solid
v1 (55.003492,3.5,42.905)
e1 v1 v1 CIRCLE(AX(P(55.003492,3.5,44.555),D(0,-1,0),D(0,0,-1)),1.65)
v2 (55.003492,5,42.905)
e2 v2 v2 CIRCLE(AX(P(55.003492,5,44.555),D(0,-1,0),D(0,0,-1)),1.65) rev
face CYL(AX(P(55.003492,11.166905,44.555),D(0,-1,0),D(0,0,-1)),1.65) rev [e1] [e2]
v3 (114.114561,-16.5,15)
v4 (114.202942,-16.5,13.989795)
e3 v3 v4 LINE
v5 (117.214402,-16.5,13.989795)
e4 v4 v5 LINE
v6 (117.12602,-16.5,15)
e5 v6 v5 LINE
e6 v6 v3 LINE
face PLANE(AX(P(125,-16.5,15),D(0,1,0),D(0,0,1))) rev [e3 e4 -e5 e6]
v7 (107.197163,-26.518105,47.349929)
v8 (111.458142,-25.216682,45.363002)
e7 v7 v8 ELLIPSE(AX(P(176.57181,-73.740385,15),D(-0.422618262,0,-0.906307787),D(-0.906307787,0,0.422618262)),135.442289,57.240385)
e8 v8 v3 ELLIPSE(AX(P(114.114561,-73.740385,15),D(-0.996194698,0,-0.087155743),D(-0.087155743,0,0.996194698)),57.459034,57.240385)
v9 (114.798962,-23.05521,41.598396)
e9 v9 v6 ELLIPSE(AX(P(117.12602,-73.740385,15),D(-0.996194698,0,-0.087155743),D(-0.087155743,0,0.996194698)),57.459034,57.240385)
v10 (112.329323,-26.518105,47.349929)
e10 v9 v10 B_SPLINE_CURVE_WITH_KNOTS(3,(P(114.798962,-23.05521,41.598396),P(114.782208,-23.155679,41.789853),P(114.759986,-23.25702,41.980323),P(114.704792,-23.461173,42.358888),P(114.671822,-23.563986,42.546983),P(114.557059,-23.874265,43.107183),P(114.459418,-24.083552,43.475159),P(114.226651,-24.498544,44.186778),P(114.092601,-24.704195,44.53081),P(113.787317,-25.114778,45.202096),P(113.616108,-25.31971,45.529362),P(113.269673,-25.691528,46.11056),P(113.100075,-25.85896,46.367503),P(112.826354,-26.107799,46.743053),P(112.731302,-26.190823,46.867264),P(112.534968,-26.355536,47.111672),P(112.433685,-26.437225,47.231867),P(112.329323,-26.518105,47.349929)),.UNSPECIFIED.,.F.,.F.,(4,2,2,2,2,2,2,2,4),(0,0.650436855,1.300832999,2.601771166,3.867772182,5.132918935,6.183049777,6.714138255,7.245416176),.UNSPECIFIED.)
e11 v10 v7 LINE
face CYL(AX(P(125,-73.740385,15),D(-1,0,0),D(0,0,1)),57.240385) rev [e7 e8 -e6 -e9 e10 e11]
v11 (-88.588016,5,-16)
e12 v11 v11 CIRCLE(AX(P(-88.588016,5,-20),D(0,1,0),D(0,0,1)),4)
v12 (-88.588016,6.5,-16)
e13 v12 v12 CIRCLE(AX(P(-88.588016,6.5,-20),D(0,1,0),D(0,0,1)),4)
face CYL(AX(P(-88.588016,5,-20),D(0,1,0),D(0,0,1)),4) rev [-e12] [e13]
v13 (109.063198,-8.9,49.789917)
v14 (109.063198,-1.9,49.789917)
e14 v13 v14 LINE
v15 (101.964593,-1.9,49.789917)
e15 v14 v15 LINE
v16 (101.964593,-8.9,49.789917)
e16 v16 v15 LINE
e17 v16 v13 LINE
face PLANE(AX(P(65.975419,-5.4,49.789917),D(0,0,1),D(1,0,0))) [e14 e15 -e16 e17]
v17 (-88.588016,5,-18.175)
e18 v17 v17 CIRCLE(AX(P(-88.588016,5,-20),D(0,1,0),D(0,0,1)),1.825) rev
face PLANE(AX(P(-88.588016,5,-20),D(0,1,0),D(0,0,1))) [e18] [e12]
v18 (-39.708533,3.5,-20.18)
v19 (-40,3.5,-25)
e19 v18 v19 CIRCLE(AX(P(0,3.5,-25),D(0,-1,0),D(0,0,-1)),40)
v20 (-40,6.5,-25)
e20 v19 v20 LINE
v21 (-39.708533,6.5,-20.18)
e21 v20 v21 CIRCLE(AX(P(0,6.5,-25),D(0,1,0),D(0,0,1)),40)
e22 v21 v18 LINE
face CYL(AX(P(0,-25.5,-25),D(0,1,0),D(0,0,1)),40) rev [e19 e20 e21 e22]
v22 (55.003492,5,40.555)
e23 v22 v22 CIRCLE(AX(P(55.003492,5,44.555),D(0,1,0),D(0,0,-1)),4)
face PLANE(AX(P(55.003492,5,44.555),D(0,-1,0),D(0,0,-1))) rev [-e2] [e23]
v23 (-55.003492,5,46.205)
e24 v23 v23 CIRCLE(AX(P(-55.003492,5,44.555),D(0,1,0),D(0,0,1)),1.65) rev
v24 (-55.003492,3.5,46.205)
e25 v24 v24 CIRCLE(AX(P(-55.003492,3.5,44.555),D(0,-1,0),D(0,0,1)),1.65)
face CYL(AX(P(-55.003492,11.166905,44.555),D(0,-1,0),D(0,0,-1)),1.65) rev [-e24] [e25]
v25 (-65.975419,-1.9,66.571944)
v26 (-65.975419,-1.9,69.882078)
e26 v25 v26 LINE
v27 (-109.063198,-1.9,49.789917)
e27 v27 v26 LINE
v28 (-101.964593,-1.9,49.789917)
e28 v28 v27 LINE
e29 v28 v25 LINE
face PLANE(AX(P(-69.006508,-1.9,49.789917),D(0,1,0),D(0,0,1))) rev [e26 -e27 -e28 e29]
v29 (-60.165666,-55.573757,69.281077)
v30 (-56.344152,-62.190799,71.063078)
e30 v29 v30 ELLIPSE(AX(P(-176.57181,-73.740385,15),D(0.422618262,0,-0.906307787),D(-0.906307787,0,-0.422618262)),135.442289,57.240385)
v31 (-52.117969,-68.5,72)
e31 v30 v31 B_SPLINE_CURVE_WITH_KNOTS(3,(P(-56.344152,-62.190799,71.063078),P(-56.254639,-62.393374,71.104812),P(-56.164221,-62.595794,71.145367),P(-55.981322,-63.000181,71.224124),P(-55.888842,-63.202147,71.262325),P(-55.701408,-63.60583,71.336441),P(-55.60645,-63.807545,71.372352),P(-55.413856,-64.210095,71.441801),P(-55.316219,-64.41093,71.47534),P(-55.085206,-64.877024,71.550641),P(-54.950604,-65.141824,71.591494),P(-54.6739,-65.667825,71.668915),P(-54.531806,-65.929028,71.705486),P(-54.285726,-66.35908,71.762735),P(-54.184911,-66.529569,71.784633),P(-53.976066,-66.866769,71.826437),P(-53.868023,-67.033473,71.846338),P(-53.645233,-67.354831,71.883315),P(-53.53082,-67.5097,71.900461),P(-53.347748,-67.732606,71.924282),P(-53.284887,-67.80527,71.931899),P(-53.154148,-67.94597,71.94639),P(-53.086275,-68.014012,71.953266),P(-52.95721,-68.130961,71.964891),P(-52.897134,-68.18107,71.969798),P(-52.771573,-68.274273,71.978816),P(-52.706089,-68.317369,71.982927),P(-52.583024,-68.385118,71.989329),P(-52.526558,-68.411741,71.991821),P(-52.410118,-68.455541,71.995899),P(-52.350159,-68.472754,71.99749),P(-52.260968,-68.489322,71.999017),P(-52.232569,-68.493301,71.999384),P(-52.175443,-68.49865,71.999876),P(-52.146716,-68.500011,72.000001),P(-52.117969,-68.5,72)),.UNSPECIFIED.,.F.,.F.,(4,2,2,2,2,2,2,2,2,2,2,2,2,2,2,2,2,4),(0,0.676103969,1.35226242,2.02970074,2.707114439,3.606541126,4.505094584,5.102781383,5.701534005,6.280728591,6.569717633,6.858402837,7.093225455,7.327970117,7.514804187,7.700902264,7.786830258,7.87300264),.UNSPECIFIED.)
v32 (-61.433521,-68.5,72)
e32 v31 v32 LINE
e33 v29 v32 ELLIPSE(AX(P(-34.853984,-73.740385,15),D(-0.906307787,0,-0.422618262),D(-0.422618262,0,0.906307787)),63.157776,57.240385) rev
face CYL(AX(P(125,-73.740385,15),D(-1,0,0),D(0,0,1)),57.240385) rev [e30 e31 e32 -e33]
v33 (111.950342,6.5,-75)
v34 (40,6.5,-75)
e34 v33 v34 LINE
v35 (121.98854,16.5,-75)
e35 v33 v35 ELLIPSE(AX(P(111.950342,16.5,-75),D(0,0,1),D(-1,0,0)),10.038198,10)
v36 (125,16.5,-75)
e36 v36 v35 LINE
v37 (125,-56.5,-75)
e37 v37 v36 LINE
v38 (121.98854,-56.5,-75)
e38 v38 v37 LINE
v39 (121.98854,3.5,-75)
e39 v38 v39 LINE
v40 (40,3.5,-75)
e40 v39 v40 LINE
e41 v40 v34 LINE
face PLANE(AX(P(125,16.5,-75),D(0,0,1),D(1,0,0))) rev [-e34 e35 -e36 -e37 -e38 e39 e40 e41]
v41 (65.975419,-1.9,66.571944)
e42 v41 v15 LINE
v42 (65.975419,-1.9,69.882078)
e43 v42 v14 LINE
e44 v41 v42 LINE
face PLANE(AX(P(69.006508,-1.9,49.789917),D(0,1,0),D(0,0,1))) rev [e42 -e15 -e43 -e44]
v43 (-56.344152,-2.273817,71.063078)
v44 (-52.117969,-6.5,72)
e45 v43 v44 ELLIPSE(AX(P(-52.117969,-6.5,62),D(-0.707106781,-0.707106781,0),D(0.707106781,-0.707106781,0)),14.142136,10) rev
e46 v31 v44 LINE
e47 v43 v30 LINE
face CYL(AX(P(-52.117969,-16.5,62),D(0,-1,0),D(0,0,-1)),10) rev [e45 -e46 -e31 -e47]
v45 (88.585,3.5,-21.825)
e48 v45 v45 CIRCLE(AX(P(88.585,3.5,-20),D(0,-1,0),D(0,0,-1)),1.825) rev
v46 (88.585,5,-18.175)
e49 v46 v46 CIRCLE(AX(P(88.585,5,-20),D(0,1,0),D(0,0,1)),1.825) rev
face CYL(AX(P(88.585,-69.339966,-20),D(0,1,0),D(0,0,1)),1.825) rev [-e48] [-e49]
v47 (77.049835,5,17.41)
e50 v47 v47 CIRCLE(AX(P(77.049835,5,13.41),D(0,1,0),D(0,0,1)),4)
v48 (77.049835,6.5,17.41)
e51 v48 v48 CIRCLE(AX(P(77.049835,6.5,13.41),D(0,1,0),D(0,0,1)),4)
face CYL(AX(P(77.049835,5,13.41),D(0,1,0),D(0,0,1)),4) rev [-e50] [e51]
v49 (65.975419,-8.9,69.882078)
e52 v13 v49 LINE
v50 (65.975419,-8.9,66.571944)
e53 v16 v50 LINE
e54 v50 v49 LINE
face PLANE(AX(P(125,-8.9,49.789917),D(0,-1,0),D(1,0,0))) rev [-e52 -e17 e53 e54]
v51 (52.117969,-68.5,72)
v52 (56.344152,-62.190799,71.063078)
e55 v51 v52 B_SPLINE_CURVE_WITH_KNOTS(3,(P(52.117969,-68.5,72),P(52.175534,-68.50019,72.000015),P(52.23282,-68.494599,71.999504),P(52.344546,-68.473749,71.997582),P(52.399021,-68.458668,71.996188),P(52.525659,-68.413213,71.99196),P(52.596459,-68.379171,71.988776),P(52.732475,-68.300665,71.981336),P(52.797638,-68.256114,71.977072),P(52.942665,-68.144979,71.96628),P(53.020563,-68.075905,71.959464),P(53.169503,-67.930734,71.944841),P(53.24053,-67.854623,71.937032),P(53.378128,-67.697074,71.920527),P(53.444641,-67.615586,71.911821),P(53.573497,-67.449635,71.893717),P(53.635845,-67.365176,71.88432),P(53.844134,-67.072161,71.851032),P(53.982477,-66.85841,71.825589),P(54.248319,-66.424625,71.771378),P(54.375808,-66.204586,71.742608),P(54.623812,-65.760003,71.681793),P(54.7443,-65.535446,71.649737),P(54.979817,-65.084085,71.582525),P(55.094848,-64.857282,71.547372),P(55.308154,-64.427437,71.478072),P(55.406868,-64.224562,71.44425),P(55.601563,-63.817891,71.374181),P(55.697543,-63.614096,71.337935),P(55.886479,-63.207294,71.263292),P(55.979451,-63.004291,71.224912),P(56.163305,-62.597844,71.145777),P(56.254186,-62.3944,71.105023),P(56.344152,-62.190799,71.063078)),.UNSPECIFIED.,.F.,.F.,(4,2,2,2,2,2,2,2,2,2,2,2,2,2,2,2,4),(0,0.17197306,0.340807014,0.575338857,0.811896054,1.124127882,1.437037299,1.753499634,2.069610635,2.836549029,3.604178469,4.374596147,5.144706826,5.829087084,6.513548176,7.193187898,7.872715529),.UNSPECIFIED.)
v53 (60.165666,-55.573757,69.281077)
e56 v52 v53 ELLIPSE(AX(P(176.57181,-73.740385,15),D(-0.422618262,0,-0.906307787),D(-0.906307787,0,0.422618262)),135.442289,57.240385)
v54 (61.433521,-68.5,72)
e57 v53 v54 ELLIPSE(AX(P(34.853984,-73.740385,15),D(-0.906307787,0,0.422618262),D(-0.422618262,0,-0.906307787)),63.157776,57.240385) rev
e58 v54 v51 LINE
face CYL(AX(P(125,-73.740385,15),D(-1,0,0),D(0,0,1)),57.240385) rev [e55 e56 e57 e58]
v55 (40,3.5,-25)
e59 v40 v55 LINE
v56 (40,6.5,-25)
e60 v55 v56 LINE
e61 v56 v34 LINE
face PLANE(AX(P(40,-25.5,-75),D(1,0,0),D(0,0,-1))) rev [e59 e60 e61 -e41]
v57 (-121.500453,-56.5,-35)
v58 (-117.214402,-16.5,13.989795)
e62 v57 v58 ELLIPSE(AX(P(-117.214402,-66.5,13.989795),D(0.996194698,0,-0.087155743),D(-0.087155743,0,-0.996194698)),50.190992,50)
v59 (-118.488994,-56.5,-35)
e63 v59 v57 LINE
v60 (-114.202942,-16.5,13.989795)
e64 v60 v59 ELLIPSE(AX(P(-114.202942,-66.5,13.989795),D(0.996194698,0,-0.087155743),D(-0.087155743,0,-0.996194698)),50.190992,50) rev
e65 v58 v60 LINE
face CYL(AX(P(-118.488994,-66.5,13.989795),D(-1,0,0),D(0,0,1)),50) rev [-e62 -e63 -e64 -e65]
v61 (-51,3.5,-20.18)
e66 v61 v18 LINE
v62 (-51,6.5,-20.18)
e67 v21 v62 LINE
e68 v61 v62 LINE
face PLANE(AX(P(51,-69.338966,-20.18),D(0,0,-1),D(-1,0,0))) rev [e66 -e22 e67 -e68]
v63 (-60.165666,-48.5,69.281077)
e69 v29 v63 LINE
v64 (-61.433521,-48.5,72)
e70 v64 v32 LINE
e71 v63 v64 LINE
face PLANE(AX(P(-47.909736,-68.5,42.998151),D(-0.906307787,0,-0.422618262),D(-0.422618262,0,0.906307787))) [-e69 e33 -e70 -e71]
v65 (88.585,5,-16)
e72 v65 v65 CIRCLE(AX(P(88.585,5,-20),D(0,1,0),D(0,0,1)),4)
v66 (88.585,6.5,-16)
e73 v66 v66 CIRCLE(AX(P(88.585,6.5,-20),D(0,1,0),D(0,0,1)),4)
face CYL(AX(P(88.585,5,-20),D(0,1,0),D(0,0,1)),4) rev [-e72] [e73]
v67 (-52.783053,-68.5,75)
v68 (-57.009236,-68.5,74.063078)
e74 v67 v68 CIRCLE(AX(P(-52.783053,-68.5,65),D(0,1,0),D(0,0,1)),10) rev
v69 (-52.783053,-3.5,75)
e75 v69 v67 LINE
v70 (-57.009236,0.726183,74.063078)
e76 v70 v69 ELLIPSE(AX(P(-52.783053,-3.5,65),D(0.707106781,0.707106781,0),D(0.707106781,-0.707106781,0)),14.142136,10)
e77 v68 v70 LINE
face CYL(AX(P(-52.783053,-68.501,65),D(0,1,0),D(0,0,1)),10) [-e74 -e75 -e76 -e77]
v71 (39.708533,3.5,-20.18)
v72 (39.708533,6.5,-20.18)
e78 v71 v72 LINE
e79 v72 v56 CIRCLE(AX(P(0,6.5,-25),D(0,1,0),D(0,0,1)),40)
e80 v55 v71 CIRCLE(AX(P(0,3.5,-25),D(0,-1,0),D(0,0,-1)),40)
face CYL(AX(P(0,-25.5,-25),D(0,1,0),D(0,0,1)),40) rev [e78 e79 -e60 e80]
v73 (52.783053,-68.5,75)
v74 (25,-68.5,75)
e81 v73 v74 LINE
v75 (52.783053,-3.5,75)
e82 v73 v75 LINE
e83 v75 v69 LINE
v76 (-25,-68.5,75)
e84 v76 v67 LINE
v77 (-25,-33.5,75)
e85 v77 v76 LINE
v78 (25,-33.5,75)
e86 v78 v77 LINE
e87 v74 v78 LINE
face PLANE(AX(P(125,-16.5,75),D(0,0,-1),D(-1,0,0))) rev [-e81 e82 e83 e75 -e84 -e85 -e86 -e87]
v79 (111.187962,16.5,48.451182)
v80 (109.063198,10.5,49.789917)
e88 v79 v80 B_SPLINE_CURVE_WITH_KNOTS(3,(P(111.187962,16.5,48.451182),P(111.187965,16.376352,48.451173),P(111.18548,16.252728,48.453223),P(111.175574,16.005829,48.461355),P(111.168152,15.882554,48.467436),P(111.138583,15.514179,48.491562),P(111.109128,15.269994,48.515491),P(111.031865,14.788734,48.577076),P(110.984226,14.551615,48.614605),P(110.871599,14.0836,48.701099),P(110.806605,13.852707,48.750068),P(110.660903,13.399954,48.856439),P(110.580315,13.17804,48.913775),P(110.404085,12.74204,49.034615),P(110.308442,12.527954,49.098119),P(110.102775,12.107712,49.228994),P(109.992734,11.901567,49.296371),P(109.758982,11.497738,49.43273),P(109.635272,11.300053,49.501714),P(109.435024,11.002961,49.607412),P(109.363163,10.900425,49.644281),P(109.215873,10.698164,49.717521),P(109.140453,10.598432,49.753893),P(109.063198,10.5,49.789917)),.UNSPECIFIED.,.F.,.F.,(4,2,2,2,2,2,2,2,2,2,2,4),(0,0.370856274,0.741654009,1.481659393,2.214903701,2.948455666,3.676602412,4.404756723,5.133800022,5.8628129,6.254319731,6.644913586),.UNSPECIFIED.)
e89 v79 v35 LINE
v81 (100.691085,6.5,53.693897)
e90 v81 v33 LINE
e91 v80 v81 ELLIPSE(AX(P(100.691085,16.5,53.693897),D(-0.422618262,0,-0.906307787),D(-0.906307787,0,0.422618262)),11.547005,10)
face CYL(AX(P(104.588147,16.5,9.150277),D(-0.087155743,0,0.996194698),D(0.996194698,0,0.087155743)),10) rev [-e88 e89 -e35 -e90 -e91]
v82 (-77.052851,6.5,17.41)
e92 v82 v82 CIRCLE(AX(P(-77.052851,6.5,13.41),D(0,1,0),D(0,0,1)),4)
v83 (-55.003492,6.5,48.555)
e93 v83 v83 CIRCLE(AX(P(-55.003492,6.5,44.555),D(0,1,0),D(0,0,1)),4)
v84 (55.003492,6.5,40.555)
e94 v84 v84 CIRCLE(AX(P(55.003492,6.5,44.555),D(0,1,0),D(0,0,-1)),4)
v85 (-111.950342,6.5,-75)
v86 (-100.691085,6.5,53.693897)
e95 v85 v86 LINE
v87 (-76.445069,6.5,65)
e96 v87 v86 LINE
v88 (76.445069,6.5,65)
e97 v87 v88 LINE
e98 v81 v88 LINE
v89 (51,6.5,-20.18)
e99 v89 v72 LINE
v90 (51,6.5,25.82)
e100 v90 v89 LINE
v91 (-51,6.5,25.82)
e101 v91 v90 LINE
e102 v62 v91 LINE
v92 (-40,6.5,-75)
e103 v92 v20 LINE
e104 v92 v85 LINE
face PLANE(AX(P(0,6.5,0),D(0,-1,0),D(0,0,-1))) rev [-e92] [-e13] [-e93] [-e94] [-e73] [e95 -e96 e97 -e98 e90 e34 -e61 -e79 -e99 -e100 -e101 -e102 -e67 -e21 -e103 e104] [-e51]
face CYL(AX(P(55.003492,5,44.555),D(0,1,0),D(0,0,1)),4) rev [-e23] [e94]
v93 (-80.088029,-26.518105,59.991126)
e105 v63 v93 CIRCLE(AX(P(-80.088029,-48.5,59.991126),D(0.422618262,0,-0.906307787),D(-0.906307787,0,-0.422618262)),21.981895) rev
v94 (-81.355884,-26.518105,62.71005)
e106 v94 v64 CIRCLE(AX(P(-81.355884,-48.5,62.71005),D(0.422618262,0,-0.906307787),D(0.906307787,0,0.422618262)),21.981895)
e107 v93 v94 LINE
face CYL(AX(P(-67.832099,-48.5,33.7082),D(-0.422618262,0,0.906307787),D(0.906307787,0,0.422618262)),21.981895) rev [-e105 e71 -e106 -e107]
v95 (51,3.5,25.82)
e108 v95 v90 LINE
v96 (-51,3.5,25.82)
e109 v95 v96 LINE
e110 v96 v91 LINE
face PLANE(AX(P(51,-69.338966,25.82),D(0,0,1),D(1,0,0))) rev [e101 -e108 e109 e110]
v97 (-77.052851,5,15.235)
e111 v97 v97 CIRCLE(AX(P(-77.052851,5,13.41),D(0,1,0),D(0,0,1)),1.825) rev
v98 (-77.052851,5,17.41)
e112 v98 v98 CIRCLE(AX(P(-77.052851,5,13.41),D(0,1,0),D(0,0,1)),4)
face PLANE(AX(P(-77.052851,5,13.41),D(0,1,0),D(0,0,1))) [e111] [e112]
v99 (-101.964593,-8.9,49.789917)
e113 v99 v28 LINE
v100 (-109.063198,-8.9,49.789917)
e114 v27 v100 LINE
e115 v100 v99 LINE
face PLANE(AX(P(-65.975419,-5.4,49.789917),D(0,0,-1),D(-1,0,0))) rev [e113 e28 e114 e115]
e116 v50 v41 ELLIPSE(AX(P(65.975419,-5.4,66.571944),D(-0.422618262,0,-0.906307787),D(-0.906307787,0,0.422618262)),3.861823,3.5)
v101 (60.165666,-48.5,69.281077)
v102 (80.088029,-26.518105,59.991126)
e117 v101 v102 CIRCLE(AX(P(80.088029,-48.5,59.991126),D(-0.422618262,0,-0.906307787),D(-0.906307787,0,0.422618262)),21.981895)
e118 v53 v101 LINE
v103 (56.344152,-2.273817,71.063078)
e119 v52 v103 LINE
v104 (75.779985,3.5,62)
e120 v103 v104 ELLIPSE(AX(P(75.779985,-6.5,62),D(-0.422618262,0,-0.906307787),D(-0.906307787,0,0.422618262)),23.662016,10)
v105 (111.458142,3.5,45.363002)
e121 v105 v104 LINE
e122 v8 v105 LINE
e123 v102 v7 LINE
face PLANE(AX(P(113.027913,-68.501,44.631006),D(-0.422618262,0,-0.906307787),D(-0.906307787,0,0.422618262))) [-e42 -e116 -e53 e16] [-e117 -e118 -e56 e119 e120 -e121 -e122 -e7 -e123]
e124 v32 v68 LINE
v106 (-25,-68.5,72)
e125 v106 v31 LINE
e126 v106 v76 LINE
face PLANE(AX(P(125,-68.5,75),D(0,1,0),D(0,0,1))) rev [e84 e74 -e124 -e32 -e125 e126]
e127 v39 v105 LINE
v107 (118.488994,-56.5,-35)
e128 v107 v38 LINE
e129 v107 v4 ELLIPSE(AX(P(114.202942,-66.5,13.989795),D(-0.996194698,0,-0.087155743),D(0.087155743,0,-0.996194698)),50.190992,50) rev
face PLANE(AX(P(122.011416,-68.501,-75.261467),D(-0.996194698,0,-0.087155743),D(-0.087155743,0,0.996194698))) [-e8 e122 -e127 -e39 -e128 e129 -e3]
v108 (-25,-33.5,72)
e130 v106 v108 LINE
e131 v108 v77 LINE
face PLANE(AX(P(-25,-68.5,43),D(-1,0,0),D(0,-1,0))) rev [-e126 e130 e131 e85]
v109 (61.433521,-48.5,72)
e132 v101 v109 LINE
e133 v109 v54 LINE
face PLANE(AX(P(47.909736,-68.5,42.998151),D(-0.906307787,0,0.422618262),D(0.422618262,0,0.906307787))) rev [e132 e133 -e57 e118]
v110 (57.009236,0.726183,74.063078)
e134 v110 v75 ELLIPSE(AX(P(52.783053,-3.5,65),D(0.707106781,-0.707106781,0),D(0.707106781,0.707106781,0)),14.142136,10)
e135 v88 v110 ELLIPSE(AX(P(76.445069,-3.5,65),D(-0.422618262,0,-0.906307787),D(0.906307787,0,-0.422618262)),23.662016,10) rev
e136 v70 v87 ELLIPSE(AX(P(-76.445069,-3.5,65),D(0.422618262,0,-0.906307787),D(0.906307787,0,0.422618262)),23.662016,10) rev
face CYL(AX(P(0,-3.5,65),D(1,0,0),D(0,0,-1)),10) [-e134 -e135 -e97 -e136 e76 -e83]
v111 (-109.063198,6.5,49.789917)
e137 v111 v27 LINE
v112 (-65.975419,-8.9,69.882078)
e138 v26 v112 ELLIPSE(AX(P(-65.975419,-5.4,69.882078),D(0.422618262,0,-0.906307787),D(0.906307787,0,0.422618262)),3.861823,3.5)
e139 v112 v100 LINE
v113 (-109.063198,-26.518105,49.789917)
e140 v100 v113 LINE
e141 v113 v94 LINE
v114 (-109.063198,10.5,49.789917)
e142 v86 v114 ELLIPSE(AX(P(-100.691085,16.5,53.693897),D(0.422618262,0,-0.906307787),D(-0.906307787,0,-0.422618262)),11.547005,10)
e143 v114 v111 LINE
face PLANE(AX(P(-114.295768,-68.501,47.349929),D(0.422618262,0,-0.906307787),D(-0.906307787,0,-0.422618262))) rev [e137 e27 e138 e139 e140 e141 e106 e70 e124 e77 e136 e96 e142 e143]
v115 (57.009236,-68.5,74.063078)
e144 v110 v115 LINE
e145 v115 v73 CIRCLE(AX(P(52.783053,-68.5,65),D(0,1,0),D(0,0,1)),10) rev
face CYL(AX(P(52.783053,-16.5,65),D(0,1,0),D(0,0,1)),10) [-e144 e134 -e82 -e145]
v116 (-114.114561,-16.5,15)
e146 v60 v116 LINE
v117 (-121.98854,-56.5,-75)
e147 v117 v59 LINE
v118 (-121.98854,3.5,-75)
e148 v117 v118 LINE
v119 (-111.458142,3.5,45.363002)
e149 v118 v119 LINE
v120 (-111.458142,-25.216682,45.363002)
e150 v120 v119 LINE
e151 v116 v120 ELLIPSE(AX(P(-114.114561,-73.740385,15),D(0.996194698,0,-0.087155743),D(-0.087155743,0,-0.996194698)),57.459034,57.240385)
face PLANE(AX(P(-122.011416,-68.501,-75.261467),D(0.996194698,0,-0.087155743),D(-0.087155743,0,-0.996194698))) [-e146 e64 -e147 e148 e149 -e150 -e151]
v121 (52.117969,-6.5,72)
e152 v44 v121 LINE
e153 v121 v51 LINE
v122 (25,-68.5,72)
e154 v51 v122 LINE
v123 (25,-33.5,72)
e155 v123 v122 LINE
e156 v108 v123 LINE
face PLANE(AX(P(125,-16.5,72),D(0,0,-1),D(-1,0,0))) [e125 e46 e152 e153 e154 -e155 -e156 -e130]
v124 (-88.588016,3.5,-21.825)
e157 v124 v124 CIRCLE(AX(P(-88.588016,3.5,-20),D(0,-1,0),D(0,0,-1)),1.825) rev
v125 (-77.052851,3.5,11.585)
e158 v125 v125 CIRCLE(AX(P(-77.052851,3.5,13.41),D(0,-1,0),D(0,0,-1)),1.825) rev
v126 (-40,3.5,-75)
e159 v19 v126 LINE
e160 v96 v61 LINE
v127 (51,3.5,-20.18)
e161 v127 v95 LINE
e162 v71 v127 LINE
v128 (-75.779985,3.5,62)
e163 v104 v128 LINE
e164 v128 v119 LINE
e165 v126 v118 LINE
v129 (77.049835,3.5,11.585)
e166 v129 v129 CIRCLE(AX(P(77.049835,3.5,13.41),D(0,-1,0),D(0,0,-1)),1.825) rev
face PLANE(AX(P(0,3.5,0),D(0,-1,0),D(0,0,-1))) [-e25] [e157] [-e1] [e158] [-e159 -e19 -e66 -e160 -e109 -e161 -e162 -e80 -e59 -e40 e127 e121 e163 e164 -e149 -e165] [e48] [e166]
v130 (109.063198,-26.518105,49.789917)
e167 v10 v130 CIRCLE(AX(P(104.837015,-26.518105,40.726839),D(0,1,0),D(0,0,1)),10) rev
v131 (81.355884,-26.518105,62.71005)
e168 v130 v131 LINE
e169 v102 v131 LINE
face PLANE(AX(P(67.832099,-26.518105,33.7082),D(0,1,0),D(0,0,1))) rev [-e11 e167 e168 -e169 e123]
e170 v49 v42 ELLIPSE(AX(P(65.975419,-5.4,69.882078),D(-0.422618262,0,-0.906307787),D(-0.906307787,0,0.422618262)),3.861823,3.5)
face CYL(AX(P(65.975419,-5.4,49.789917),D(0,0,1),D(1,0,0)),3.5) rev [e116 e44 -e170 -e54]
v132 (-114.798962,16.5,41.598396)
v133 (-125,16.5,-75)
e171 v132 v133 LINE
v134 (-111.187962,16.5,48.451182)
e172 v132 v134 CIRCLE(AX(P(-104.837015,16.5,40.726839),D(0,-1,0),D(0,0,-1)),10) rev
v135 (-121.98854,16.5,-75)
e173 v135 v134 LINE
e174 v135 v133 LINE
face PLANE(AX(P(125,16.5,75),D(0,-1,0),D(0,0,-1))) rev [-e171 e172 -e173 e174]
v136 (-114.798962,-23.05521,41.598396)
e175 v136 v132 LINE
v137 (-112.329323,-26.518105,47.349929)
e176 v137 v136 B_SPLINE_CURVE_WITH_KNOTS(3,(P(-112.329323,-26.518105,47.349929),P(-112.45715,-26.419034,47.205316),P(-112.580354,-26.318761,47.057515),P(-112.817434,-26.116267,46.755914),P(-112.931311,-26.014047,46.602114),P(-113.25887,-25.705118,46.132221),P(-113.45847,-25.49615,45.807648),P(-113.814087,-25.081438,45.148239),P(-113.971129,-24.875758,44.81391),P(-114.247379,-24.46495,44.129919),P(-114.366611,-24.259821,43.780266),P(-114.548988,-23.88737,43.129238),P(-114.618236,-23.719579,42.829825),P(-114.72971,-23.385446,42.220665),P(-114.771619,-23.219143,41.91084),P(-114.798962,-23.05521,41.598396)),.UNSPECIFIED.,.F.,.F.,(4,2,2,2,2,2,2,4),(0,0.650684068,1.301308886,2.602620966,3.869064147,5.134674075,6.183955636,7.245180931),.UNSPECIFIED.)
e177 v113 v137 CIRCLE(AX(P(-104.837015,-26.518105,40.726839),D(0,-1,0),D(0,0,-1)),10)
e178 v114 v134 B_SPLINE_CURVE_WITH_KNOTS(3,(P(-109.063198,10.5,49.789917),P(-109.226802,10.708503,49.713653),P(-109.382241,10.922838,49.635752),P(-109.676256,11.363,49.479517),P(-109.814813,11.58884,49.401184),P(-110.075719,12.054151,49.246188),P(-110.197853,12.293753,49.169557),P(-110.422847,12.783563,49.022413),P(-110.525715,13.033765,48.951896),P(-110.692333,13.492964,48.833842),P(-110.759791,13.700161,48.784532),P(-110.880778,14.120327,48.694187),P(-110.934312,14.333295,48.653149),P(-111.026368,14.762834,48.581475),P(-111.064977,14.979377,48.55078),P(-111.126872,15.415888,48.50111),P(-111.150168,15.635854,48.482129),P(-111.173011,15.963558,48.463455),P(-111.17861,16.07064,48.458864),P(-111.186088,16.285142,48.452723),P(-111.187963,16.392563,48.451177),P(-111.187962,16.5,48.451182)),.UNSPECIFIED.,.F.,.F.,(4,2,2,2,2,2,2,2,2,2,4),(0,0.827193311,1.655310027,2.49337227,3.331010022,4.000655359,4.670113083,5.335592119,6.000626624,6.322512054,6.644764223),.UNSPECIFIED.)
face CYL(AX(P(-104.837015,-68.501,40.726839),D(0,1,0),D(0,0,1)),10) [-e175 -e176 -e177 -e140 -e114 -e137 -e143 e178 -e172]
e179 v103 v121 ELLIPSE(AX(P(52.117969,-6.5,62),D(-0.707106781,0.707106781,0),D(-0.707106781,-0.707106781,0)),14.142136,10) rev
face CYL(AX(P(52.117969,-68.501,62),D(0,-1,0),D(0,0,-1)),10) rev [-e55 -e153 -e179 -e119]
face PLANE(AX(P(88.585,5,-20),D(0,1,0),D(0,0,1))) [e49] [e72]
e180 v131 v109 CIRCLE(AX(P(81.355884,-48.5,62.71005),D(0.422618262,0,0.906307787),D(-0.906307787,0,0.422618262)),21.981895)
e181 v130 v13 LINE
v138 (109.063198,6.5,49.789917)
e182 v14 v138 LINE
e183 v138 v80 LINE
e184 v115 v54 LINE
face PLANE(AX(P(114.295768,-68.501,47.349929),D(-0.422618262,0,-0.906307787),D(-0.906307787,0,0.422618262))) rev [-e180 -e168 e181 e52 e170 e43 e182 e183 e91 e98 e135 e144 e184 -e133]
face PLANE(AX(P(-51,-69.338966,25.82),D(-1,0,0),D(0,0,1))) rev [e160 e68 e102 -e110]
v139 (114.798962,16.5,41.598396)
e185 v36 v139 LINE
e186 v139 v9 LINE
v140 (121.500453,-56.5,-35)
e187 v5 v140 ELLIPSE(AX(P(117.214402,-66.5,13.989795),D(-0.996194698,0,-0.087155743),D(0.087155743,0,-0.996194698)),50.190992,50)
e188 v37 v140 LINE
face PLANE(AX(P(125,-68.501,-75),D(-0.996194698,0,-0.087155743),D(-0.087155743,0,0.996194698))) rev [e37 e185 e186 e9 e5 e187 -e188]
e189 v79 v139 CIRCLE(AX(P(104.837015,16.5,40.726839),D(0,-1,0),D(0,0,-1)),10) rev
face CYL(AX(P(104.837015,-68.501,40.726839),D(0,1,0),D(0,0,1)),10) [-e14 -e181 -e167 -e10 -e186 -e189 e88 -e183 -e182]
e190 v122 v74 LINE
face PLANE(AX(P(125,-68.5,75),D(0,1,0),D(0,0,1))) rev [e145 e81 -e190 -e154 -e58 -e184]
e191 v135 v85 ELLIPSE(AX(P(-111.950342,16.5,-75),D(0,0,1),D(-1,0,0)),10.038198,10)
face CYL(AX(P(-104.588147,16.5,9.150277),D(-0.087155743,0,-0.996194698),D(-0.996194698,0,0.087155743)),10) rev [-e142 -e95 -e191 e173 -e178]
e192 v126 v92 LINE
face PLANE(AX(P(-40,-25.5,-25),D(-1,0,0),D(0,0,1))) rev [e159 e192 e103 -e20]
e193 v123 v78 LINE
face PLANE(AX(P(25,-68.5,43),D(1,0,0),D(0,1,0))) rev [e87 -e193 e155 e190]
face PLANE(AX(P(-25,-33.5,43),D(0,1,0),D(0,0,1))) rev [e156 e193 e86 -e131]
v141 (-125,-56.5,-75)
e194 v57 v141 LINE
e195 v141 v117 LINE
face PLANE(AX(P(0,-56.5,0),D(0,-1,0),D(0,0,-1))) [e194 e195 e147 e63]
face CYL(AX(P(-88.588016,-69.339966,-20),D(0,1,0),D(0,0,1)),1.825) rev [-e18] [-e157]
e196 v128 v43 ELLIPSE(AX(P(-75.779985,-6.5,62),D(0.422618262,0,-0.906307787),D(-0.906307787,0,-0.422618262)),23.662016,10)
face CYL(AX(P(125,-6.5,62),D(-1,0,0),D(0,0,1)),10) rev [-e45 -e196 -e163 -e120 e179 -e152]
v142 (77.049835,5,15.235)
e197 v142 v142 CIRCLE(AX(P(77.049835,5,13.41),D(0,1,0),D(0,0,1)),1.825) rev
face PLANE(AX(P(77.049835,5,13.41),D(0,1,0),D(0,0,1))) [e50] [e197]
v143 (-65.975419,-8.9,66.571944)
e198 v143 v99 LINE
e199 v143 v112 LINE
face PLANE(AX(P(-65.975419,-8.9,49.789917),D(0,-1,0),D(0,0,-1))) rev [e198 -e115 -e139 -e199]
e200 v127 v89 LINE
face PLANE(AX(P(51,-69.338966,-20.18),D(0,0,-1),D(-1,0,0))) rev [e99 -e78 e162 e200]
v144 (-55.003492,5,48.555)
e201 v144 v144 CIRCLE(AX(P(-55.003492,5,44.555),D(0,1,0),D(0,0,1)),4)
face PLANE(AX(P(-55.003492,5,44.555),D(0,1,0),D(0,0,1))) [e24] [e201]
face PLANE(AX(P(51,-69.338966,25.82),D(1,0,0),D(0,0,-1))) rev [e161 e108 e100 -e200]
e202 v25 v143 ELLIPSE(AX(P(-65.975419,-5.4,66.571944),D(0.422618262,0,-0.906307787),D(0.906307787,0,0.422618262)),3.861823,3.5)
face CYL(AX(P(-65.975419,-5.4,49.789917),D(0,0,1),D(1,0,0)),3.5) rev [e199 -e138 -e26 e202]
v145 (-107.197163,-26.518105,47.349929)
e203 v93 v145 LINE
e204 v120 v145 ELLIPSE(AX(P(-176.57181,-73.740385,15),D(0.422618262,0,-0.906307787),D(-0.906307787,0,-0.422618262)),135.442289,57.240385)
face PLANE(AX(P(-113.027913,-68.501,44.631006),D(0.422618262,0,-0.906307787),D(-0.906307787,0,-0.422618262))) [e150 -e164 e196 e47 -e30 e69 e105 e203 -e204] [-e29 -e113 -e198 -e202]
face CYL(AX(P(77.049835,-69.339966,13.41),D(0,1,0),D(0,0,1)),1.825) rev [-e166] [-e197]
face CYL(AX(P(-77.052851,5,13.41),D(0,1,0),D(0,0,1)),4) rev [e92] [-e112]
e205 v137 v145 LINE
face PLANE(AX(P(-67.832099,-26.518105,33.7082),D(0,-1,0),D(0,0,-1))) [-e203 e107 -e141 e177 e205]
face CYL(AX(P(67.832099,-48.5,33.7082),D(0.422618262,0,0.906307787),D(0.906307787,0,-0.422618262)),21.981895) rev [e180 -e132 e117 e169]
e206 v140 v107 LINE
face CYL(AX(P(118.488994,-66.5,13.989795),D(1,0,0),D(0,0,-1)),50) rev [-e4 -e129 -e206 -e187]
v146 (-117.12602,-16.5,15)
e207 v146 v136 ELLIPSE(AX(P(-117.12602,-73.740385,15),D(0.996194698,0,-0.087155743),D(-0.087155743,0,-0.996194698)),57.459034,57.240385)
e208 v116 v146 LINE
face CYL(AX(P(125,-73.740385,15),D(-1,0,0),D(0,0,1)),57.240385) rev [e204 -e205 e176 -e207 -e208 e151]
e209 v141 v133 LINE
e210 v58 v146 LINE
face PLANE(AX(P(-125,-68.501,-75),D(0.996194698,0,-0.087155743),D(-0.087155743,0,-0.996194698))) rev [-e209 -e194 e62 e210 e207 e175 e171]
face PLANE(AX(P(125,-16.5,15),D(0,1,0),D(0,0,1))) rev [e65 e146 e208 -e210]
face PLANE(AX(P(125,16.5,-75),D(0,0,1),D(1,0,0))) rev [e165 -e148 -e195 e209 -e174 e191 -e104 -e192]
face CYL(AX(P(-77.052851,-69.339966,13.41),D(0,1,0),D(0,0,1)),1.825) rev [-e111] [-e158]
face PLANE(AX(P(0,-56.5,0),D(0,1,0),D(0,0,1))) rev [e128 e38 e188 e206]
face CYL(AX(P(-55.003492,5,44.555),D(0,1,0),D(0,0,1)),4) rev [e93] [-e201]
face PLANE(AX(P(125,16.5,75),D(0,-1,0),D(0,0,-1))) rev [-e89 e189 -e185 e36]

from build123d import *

# Parameters (mm, degrees)
SALIENTE_EXTRUIR1_DEPTH = 125
CORTAR_EXTRUIR1_REACH   = 170.745
CORTAR_EXTRUIR2_DEPTH   = 10
VACIADO1_START          = -69
VACIADO1_DEPTH          = 72.5
CORTAR_EXTRUIR4_DEPTH   = 32
CROQUIS6_W              = 50
CROQUIS6_H              = 35
CORTAR_EXTRUIR5_DEPTH   = 32
CORTAR_EXTRUIR6_DEPTH   = 32
REDONDEO1_R             = 10
CORTAR_EXTRUIR8_REACH   = 165.936
CROQUIS9_R              = 1.825
CROQUIS10_R             = 4
CORTAR_EXTRUIR9_DEPTH   = 1.5
CORTAR_EXTRUIR10_DEPTH  = 25.21008
CROQUIS12_R             = 1.65
CORTAR_EXTRUIR11_DEPTH  = 3
CROQUIS13_R             = 4
CORTAR_EXTRUIR12_DEPTH  = 1.5
CROQUIS16_W             = 102
CROQUIS16_H             = 46
CORTAR_EXTRUIR13_DEPTH  = 164.935963199
SALIENTE_EXTRUIR2_DEPTH = 40
REDONDEO2_R             = 50


with BuildPart() as part:
    # Croquis2 → Saliente-Extruir1 (new, symmetric)
    with BuildSketch(Plane(origin=(0, 0, 0), x_dir=(0, 0, -1), z_dir=(1, 0, 0))):
        with BuildLine():
            Line((-75, -16.5), (-75, -68.5))
            Line((-75, -68.5), (-72, -68.5))
            ThreePointArc((-72, -68.5), (-53.577843382, -31.453133216), (-15, -16.5))
            Line((-15, -16.5), (75, -16.5))
            Line((75, -16.5), (75, 16.5))
            Line((75, 16.5), (-75, 16.5))
            Line((-75, 16.5), (-75, -16.5))
        make_face()
    extrude(amount=SALIENTE_EXTRUIR1_DEPTH, both=True)

    # Croquis3 → Cortar-Extruir1 (cut, up to next)
    with BuildSketch(Plane(origin=(0, 16.5, 0), x_dir=(1, 0, 0), z_dir=(0, 1, 0)), mode=Mode.PRIVATE) as cortar_extruir1_sk1:
        Polygon((-125, 75), (-114.295768213, -47.349929186), (-55, -75), (-125, -75), align=None)
    cortar_extruir1_tool1 = extrude(cortar_extruir1_sk1.sketch, amount=-CORTAR_EXTRUIR1_REACH, mode=Mode.PRIVATE) & part.part
    # Croquis3 → Cortar-Extruir1 (cut, up to next)
    with BuildSketch(Plane(origin=(0, 16.5, 0), x_dir=(1, 0, 0), z_dir=(0, 1, 0)), mode=Mode.PRIVATE) as cortar_extruir1_sk2:
        Polygon((114.295768213, -47.349929186), (55, -75), (125, -75), (125, 75), align=None)
    cortar_extruir1_tool2 = extrude(cortar_extruir1_sk2.sketch, amount=-CORTAR_EXTRUIR1_REACH, mode=Mode.PRIVATE) & part.part
    add(cortar_extruir1_tool1.solids().sort_by_distance((-121.29688, 16.5, -13.680767))[0], mode=Mode.SUBTRACT)
    add(cortar_extruir1_tool2.solids().sort_by_distance((85.347442, 16.5, 62.675171))[0], mode=Mode.SUBTRACT)

    # Croquis4 → Cortar-Extruir2 (cut)
    with BuildSketch(Plane(origin=(0, 16.5, 0), x_dir=(1, 0, 0), z_dir=(0, 1, 0))):
        Polygon((-108.865240958, -75), (-121.988540487, 75), (121.988540487, 75), (108.865240958, -75), align=None)
    extrude(amount=-CORTAR_EXTRUIR2_DEPTH, mode=Mode.SUBTRACT)

    # Vaciado1: read off the stored shape, not the designer's step
    # Vaciado1 outline → Vaciado1 (cut)
    with BuildSketch(Plane(origin=(0, 0, 0), x_dir=(1, 0, 0), z_dir=(0, 1, 0)).offset(VACIADO1_START)):
        Polygon((-121.988540487, 75), (-111.458142293, -45.363002127), (-54.334916012, -72), (54.334916012, -72), (111.458142293, -45.363002127), (121.988540487, 75), align=None)
    extrude(amount=VACIADO1_DEPTH, mode=Mode.SUBTRACT)

    # Croquis5 → Cortar-Extruir4 (cut)
    with BuildSketch(Plane(origin=(0, 6.5, 0), x_dir=(1, 0, 0), z_dir=(0, 1, 0))):
        with BuildLine():
            Line((-40, 25), (-40, 75))
            Line((-40, 75), (40, 75))
            Line((40, 75), (40, 25))
            ThreePointArc((40, 25), (0, -15), (-40, 25))
        make_face()
    extrude(amount=-CORTAR_EXTRUIR4_DEPTH, mode=Mode.SUBTRACT)

    # Croquis6 → Cortar-Extruir5 (cut)
    with BuildSketch(Plane.XY.offset(75)):
        with Locations((0, -51)):
            Rectangle(CROQUIS6_W, CROQUIS6_H)
    extrude(amount=-CORTAR_EXTRUIR5_DEPTH, mode=Mode.SUBTRACT)

    # Croquis7 → Cortar-Extruir6 (cut)
    with BuildSketch(Plane(origin=(38.550007351, 0, 82.670757549), x_dir=(0.9063077870366526, 0, -0.4226182617406938), z_dir=(0.42261826174069383, 0, 0.9063077870366527))):
        with BuildLine():
            Line((25.249163406, -68.5), (25.249163406, -48.5))
            ThreePointArc((25.249163406, -48.5), (31.687511452, -32.956452829), (47.231058623, -26.518104783))
            Line((47.231058623, -26.518104783), (83.576199991, -26.518104783))
            add(Edge.make_bspline(
                [(83.576199991, -26.518104783), (31.075327753, -41.718019878), (25.249163406, -68.5)],
                knots=[5.313015178, 5.313015178, 5.313015178, 6.191506455, 6.191506455, 6.191506455], degree=2, weights=[1, 0.905072718, 1]))
        make_face()
    cortar_extruir6 = extrude(amount=-CORTAR_EXTRUIR6_DEPTH, mode=Mode.SUBTRACT)

    # Simetría1: Cortar-Extruir6 across plane
    add(cortar_extruir6.mirror(Plane(origin=(0, 0, 0), x_dir=(0, 0, 1), z_dir=(1, 0, 0))), mode=Mode.SUBTRACT)

    # Redondeo1
    # the kernel refuses this fillet: 10 mm, written as the material it adds along each edge
    with BuildSketch(Plane(origin=(-54.334916012, -74.042366566, 72), x_dir=(1, 0, 0), z_dir=(0, 1, 0))) as redondeo1_piece_1_section:
        with BuildLine():
            CenterArc((REDONDEO1_R * 0.22169466264, REDONDEO1_R), REDONDEO1_R, 245, 25)
            Line((-REDONDEO1_R * 0.200923599096, REDONDEO1_R * 0.0936922129612), (0, 0))
            Line((0, 0), (REDONDEO1_R * 0.22169466264, 0))
        make_face()
    redondeo1_piece_1 = extrude(amount=77.542366566, mode=Mode.PRIVATE)
    redondeo1_piece_1 = redondeo1_piece_1 - Plane(origin=(-54.334916012, -73.740384615, 15), x_dir=(0, 0.09155047875020969, 0.9958004367545775), z_dir=(1, 0, 0)) * Cylinder(57.240384615, 164, mode=Mode.PRIVATE)
    add(redondeo1_piece_1)
    with BuildSketch(Plane(origin=(-79.334916012, 3.5, 72), x_dir=(0, -1, 0), z_dir=(1, 0, 0))) as redondeo1_piece_2_section:
        with BuildLine():
            CenterArc((REDONDEO1_R, REDONDEO1_R), REDONDEO1_R, 180, 90)
            Line((0, REDONDEO1_R), (0, 0))
            Line((0, 0), (REDONDEO1_R, 0))
        make_face()
    redondeo1_piece_2 = extrude(amount=158.669832024, mode=Mode.PRIVATE)
    redondeo1_piece_2 = split(redondeo1_piece_2, bisect_by=Plane(origin=(-55.460655907, 3.5, 123.198516017), z_dir=(-0.4226182617361229, 0, -0.9063077870387841)), keep=Keep.TOP, mode=Mode.PRIVATE)
    redondeo1_piece_2 = split(redondeo1_piece_2, bisect_by=Plane(origin=(-74.869761133, 3.5, 62.424444461), z_dir=(0.4226182617361229, 0, -0.9063077870387841)), keep=Keep.TOP, mode=Mode.PRIVATE)
    add(redondeo1_piece_2)
    with BuildSketch(Plane(origin=(54.334916012, -74.042366566, 72), x_dir=(-1, 0, 0), z_dir=(0, 1, 0))) as redondeo1_piece_3_section:
        with BuildLine():
            CenterArc((REDONDEO1_R * 0.22169466264, -REDONDEO1_R), REDONDEO1_R, 90, 25)
            Line((-REDONDEO1_R * 0.200923599096, -REDONDEO1_R * 0.0936922129612), (0, 0))
            Line((0, 0), (REDONDEO1_R * 0.22169466264, 0))
        make_face()
    redondeo1_piece_3 = extrude(amount=77.542366566, mode=Mode.PRIVATE)
    redondeo1_piece_3 = redondeo1_piece_3 - Plane(origin=(54.334916012, -73.740384615, 15), x_dir=(0, 0.09155047875020969, 0.9958004367545775), z_dir=(1, 0, 0)) * Cylinder(57.240384615, 164, mode=Mode.PRIVATE)
    add(redondeo1_piece_3)
    with BuildSketch(Plane(origin=(124.167434056, 6.5, -99.904867452), x_dir=(-0.996194698091746, 0, -0.0871557427476514), z_dir=(-0.0871557427476514, 0, 0.9961946980917462))) as redondeo1_piece_4_section:
        with BuildLine():
            CenterArc((REDONDEO1_R, -REDONDEO1_R), REDONDEO1_R, 90, 90)
            Line((0, -REDONDEO1_R), (0, 0))
            Line((0, 0), (REDONDEO1_R, 0))
        make_face()
    redondeo1_piece_4 = extrude(amount=174.286870856, mode=Mode.PRIVATE)
    redondeo1_piece_4 = split(redondeo1_piece_4, bisect_by=Plane(origin=(178.806152724, 6.5, 17.268242858), z_dir=(-0.42261826174069395, 0, -0.9063077870366526)), keep=Keep.TOP, mode=Mode.PRIVATE)
    redondeo1_piece_4 = split(redondeo1_piece_4, bisect_by=Plane(origin=(124.167434056, 6.5, -75), z_dir=(0, 0, 1)), keep=Keep.TOP, mode=Mode.PRIVATE)
    add(redondeo1_piece_4)
    with BuildSketch(Plane(origin=(-108.977332375, 6.5, 73.718789241), x_dir=(0.996194698091746, 0, -0.08715574274765167), z_dir=(-0.08715574274765168, 0, -0.9961946980917462))) as redondeo1_piece_5_section:
        with BuildLine():
            CenterArc((REDONDEO1_R, -REDONDEO1_R), REDONDEO1_R, 90, 90)
            Line((0, -REDONDEO1_R), (0, 0))
            Line((0, 0), (REDONDEO1_R, 0))
        make_face()
    redondeo1_piece_5 = extrude(amount=174.286870856, mode=Mode.PRIVATE)
    redondeo1_piece_5 = split(redondeo1_piece_5, bisect_by=Plane(origin=(-99.827378606, 6.5, 54.096650061), z_dir=(0.42261826174069367, 0, -0.9063077870366527)), keep=Keep.TOP, mode=Mode.PRIVATE)
    redondeo1_piece_5 = split(redondeo1_piece_5, bisect_by=Plane(origin=(-108.977332375, 6.5, -75), z_dir=(0, 0, 1)), keep=Keep.TOP, mode=Mode.PRIVATE)
    add(redondeo1_piece_5)
    # the kernel refuses this fillet: 10 mm, written as the material it takes off along each edge
    with BuildSketch(Plane(origin=(114.295768213, 30.93375673, 47.349929186), x_dir=(0.08715574274765074, 0, -0.9961946980917462), z_dir=(0, -1, 0))) as redondeo1_2_piece_1:
        with BuildLine():
            CenterArc((REDONDEO1_R * 0.57735026919, -REDONDEO1_R), REDONDEO1_R, 90, 60)
            Line((-REDONDEO1_R * 0.288675134595, -REDONDEO1_R * 0.5), (0, 0))
            Line((0, 0), (REDONDEO1_R * 0.57735026919, 0))
        make_face()
    extrude(amount=71.885618242, mode=Mode.SUBTRACT)
    with BuildSketch(Plane(origin=(-114.295768213, 30.93375673, 47.349929186), x_dir=(-0.08715574274765074, 0, -0.9961946980917462), z_dir=(0, -1, 0))) as redondeo1_2_piece_2:
        with BuildLine():
            CenterArc((REDONDEO1_R * 0.57735026919, REDONDEO1_R), REDONDEO1_R, 210, 60)
            Line((-REDONDEO1_R * 0.288675134595, REDONDEO1_R * 0.5), (0, 0))
            Line((0, 0), (REDONDEO1_R * 0.57735026919, 0))
        make_face()
    extrude(amount=71.885618242, mode=Mode.SUBTRACT)
    with BuildSketch(Plane(origin=(55, 12.042366566, 75), x_dir=(-1, 0, 0), z_dir=(0, -1, 0))) as redondeo1_2_piece_3:
        with BuildLine():
            CenterArc((REDONDEO1_R * 0.221694662643, REDONDEO1_R), REDONDEO1_R, 245, 25)
            Line((-REDONDEO1_R * 0.200923599098, REDONDEO1_R * 0.0936922129633), (0, 0))
            Line((0, 0), (REDONDEO1_R * 0.221694662643, 0))
        make_face()
    extrude(amount=86.084733132, mode=Mode.SUBTRACT)
    with BuildSketch(Plane(origin=(-55, 12.042366566, 75), x_dir=(1, 0, 0), z_dir=(0, -1, 0))) as redondeo1_2_piece_4:
        with BuildLine():
            CenterArc((REDONDEO1_R * 0.221694662643, -REDONDEO1_R), REDONDEO1_R, 90, 25)
            Line((-REDONDEO1_R * 0.200923599098, -REDONDEO1_R * 0.0936922129633), (0, 0))
            Line((0, 0), (REDONDEO1_R * 0.221694662643, 0))
        make_face()
    extrude(amount=86.084733132, mode=Mode.SUBTRACT)
    with BuildSketch(Plane(origin=(80, 6.5, 75), x_dir=(0, -1, 0), z_dir=(-1, 0, 0))) as redondeo1_2_piece_5:
        with BuildLine():
            CenterArc((REDONDEO1_R, -REDONDEO1_R), REDONDEO1_R, 90, 90)
            Line((0, -REDONDEO1_R), (0, 0))
            Line((0, 0), (REDONDEO1_R, 0))
        make_face()
    extrude(amount=160, mode=Mode.SUBTRACT)

    # Croquis9 → Cortar-Extruir8 (cut, up to next)
    with BuildSketch(Plane(origin=(0, 6.5, 0), x_dir=(1, 0, 0), z_dir=(0, 1, 0)), mode=Mode.PRIVATE) as cortar_extruir8_sk1:
        with Locations(Location((88.585, 20, 0), (0, 0, 270))):
            Circle(CROQUIS9_R)
    cortar_extruir8_tool1 = extrude(cortar_extruir8_sk1.sketch, amount=-CORTAR_EXTRUIR8_REACH, mode=Mode.PRIVATE) & part.part
    # Croquis9 → Cortar-Extruir8 (cut, up to next)
    with BuildSketch(Plane(origin=(0, 6.5, 0), x_dir=(1, 0, 0), z_dir=(0, 1, 0)), mode=Mode.PRIVATE) as cortar_extruir8_sk2:
        with Locations(Location((77.049834861, -13.41, 0), (0, 0, 270))):
            Circle(CROQUIS9_R)
    cortar_extruir8_tool2 = extrude(cortar_extruir8_sk2.sketch, amount=-CORTAR_EXTRUIR8_REACH, mode=Mode.PRIVATE) & part.part
    # Croquis9 → Cortar-Extruir8 (cut, up to next)
    with BuildSketch(Plane(origin=(0, 6.5, 0), x_dir=(1, 0, 0), z_dir=(0, 1, 0)), mode=Mode.PRIVATE) as cortar_extruir8_sk3:
        with Locations(Location((-88.588016438, 20, 0), (0, 0, 270))):
            Circle(CROQUIS9_R)
    cortar_extruir8_tool3 = extrude(cortar_extruir8_sk3.sketch, amount=-CORTAR_EXTRUIR8_REACH, mode=Mode.PRIVATE) & part.part
    # Croquis9 → Cortar-Extruir8 (cut, up to next)
    with BuildSketch(Plane(origin=(0, 6.5, 0), x_dir=(1, 0, 0), z_dir=(0, 1, 0)), mode=Mode.PRIVATE) as cortar_extruir8_sk4:
        with Locations(Location((-77.052851299, -13.41, 0), (0, 0, 270))):
            Circle(CROQUIS9_R)
    cortar_extruir8_tool4 = extrude(cortar_extruir8_sk4.sketch, amount=-CORTAR_EXTRUIR8_REACH, mode=Mode.PRIVATE) & part.part
    add(cortar_extruir8_tool1.solids().sort_by_distance((88.585, 6.5, -20))[0], mode=Mode.SUBTRACT)
    add(cortar_extruir8_tool2.solids().sort_by_distance((77.049835, 6.5, 13.41))[0], mode=Mode.SUBTRACT)
    add(cortar_extruir8_tool3.solids().sort_by_distance((-88.588016, 6.5, -20))[0], mode=Mode.SUBTRACT)
    add(cortar_extruir8_tool4.solids().sort_by_distance((-77.052851, 6.5, 13.41))[0], mode=Mode.SUBTRACT)

    # Croquis10 → Cortar-Extruir9 (cut)
    with BuildSketch(Plane(origin=(0, 6.5, 0), x_dir=(1, 0, 0), z_dir=(0, 1, 0))):
        with Locations(Location((77.049834861, -13.41, 0), (0, 0, 270))):
            Circle(CROQUIS10_R)
        with Locations(Location((88.585, 20, 0), (0, 0, 270))):
            Circle(CROQUIS10_R)
        with Locations(Location((-88.588016438, 20, 0), (0, 0, 270))):
            Circle(CROQUIS10_R)
        with Locations(Location((-77.052851299, -13.41, 0), (0, 0, 270))):
            Circle(CROQUIS10_R)
    extrude(amount=-CORTAR_EXTRUIR9_DEPTH, mode=Mode.SUBTRACT)

    # Croquis11 → Cortar-Extruir10 (cut)
    with BuildSketch(Plane.XY.offset(75)):
        with BuildLine():
            Line((-69.006508219, -1.9), (-65.975419306, -1.9))
            ThreePointArc((-65.975419306, -1.9), (-62.475419306, -5.4), (-65.975419306, -8.9))
            Line((-65.975419306, -8.9), (-69.006508219, -8.9))
            Line((-69.006508219, -8.9), (-125, -8.9))
            Line((-125, -8.9), (-125, -1.9))
            Line((-125, -1.9), (-69.006508219, -1.9))
        make_face()
        with BuildLine():
            Line((69.006508219, -1.9), (65.975419306, -1.9))
            ThreePointArc((65.975419306, -1.9), (62.475419306, -5.4), (65.975419306, -8.9))
            Line((65.975419306, -8.9), (69.006508219, -8.9))
            Line((69.006508219, -8.9), (125, -8.9))
            Line((125, -8.9), (125, -1.9))
            Line((125, -1.9), (69.006508219, -1.9))
        make_face()
    extrude(amount=-CORTAR_EXTRUIR10_DEPTH, mode=Mode.SUBTRACT)

    # Croquis12 → Cortar-Extruir11 (cut)
    with BuildSketch(Plane.XZ.offset(-3.5)):
        with Locations(Location((55.003491781, 44.555, 0), (0, 0, 270))):
            Circle(CROQUIS12_R)
        with Locations(Location((-55.003491781, 44.555, 0), (0, 0, 270))):
            Circle(CROQUIS12_R)
    extrude(amount=-CORTAR_EXTRUIR11_DEPTH, mode=Mode.SUBTRACT)

    # Croquis13 → Cortar-Extruir12 (cut)
    with BuildSketch(Plane(origin=(0, 6.5, 0), x_dir=(1, 0, 0), z_dir=(0, 1, 0))):
        with Locations(Location((-55.003491781, -44.555, 0), (0, 0, 270))):
            Circle(CROQUIS13_R)
        with Locations(Location((55.003491781, -44.555, 0), (0, 0, 90))):
            Circle(CROQUIS13_R)
    extrude(amount=-CORTAR_EXTRUIR12_DEPTH, mode=Mode.SUBTRACT)

    # Croquis16 → Cortar-Extruir13 (cut, through all)
    with BuildSketch(Plane(origin=(0, 6.5, 0), x_dir=(1, 0, 0), z_dir=(0, 1, 0))):
        with Locations((0, -2.82000006)):
            Rectangle(CROQUIS16_W, CROQUIS16_H)
    extrude(amount=-CORTAR_EXTRUIR13_DEPTH, mode=Mode.SUBTRACT)

    # Croquis19 → Saliente-Extruir2 (add)
    with BuildSketch(Plane(origin=(0, -16.5, 0), x_dir=(-1, 0, 0), z_dir=(0, -1, 0))):
        Polygon((-125, 75), (-121.988540487, 75), (-118.488993946, 35), (-121.500453459, 35), align=None)
        Polygon((118.488993946, 35), (121.500453459, 35), (125, 75), (121.988540487, 75), align=None)
    extrude(amount=SALIENTE_EXTRUIR2_DEPTH)

    # Redondeo2
    # the kernel refuses this fillet: 50 mm, written as the material it adds along each edge
    with BuildSketch(Plane(origin=(-3.985493193, -16.5, -35), x_dir=(0, 0, 1), z_dir=(1, 0, 0))) as redondeo2_piece_1_section:
        with BuildLine():
            CenterArc((48.989794856, 50), REDONDEO2_R, 191.536959033, 78.463040967)
            Line((0, 40), (0, 0))
            Line((0, 0), (48.989794856, 0))
        make_face()
    redondeo2_piece_1 = extrude(amount=247.960433791, mode=Mode.PRIVATE)
    redondeo2_piece_1 = split(redondeo2_piece_1, bisect_by=Plane(origin=(120.547246711, -16.5, -24.104797021), z_dir=(-0.9961946980917461, 0, -0.08715574274765132)), keep=Keep.TOP, mode=Mode.PRIVATE)
    redondeo2_piece_1 = split(redondeo2_piece_1, bisect_by=Plane(origin=(117.558662617, -16.5, -24.366264249), z_dir=(0.9961946980917881, 0, 0.0871557427471721)), keep=Keep.TOP, mode=Mode.PRIVATE)
    add(redondeo2_piece_1)
    with BuildSketch(Plane(origin=(3.985493193, -16.5, -35), x_dir=(0, -1, 0), z_dir=(-1, 0, 0))) as redondeo2_piece_2_section:
        with BuildLine():
            CenterArc((50, 48.989794856), REDONDEO2_R, 180, 78.463040967)
            Line((0, 48.989794856), (0, 0))
            Line((0, 0), (40, 0))
        make_face()
    redondeo2_piece_2 = extrude(amount=247.960433791, mode=Mode.PRIVATE)
    redondeo2_piece_2 = split(redondeo2_piece_2, bisect_by=Plane(origin=(-117.558662617, -16.5, -24.366264249), z_dir=(-0.9961946980917881, 0, 0.0871557427471721)), keep=Keep.TOP, mode=Mode.PRIVATE)
    redondeo2_piece_2 = split(redondeo2_piece_2, bisect_by=Plane(origin=(-120.547246711, -16.5, -24.104797021), z_dir=(0.9961946980917461, 0, -0.08715574274765155)), keep=Keep.TOP, mode=Mode.PRIVATE)
    add(redondeo2_piece_2)


solid = part.part
